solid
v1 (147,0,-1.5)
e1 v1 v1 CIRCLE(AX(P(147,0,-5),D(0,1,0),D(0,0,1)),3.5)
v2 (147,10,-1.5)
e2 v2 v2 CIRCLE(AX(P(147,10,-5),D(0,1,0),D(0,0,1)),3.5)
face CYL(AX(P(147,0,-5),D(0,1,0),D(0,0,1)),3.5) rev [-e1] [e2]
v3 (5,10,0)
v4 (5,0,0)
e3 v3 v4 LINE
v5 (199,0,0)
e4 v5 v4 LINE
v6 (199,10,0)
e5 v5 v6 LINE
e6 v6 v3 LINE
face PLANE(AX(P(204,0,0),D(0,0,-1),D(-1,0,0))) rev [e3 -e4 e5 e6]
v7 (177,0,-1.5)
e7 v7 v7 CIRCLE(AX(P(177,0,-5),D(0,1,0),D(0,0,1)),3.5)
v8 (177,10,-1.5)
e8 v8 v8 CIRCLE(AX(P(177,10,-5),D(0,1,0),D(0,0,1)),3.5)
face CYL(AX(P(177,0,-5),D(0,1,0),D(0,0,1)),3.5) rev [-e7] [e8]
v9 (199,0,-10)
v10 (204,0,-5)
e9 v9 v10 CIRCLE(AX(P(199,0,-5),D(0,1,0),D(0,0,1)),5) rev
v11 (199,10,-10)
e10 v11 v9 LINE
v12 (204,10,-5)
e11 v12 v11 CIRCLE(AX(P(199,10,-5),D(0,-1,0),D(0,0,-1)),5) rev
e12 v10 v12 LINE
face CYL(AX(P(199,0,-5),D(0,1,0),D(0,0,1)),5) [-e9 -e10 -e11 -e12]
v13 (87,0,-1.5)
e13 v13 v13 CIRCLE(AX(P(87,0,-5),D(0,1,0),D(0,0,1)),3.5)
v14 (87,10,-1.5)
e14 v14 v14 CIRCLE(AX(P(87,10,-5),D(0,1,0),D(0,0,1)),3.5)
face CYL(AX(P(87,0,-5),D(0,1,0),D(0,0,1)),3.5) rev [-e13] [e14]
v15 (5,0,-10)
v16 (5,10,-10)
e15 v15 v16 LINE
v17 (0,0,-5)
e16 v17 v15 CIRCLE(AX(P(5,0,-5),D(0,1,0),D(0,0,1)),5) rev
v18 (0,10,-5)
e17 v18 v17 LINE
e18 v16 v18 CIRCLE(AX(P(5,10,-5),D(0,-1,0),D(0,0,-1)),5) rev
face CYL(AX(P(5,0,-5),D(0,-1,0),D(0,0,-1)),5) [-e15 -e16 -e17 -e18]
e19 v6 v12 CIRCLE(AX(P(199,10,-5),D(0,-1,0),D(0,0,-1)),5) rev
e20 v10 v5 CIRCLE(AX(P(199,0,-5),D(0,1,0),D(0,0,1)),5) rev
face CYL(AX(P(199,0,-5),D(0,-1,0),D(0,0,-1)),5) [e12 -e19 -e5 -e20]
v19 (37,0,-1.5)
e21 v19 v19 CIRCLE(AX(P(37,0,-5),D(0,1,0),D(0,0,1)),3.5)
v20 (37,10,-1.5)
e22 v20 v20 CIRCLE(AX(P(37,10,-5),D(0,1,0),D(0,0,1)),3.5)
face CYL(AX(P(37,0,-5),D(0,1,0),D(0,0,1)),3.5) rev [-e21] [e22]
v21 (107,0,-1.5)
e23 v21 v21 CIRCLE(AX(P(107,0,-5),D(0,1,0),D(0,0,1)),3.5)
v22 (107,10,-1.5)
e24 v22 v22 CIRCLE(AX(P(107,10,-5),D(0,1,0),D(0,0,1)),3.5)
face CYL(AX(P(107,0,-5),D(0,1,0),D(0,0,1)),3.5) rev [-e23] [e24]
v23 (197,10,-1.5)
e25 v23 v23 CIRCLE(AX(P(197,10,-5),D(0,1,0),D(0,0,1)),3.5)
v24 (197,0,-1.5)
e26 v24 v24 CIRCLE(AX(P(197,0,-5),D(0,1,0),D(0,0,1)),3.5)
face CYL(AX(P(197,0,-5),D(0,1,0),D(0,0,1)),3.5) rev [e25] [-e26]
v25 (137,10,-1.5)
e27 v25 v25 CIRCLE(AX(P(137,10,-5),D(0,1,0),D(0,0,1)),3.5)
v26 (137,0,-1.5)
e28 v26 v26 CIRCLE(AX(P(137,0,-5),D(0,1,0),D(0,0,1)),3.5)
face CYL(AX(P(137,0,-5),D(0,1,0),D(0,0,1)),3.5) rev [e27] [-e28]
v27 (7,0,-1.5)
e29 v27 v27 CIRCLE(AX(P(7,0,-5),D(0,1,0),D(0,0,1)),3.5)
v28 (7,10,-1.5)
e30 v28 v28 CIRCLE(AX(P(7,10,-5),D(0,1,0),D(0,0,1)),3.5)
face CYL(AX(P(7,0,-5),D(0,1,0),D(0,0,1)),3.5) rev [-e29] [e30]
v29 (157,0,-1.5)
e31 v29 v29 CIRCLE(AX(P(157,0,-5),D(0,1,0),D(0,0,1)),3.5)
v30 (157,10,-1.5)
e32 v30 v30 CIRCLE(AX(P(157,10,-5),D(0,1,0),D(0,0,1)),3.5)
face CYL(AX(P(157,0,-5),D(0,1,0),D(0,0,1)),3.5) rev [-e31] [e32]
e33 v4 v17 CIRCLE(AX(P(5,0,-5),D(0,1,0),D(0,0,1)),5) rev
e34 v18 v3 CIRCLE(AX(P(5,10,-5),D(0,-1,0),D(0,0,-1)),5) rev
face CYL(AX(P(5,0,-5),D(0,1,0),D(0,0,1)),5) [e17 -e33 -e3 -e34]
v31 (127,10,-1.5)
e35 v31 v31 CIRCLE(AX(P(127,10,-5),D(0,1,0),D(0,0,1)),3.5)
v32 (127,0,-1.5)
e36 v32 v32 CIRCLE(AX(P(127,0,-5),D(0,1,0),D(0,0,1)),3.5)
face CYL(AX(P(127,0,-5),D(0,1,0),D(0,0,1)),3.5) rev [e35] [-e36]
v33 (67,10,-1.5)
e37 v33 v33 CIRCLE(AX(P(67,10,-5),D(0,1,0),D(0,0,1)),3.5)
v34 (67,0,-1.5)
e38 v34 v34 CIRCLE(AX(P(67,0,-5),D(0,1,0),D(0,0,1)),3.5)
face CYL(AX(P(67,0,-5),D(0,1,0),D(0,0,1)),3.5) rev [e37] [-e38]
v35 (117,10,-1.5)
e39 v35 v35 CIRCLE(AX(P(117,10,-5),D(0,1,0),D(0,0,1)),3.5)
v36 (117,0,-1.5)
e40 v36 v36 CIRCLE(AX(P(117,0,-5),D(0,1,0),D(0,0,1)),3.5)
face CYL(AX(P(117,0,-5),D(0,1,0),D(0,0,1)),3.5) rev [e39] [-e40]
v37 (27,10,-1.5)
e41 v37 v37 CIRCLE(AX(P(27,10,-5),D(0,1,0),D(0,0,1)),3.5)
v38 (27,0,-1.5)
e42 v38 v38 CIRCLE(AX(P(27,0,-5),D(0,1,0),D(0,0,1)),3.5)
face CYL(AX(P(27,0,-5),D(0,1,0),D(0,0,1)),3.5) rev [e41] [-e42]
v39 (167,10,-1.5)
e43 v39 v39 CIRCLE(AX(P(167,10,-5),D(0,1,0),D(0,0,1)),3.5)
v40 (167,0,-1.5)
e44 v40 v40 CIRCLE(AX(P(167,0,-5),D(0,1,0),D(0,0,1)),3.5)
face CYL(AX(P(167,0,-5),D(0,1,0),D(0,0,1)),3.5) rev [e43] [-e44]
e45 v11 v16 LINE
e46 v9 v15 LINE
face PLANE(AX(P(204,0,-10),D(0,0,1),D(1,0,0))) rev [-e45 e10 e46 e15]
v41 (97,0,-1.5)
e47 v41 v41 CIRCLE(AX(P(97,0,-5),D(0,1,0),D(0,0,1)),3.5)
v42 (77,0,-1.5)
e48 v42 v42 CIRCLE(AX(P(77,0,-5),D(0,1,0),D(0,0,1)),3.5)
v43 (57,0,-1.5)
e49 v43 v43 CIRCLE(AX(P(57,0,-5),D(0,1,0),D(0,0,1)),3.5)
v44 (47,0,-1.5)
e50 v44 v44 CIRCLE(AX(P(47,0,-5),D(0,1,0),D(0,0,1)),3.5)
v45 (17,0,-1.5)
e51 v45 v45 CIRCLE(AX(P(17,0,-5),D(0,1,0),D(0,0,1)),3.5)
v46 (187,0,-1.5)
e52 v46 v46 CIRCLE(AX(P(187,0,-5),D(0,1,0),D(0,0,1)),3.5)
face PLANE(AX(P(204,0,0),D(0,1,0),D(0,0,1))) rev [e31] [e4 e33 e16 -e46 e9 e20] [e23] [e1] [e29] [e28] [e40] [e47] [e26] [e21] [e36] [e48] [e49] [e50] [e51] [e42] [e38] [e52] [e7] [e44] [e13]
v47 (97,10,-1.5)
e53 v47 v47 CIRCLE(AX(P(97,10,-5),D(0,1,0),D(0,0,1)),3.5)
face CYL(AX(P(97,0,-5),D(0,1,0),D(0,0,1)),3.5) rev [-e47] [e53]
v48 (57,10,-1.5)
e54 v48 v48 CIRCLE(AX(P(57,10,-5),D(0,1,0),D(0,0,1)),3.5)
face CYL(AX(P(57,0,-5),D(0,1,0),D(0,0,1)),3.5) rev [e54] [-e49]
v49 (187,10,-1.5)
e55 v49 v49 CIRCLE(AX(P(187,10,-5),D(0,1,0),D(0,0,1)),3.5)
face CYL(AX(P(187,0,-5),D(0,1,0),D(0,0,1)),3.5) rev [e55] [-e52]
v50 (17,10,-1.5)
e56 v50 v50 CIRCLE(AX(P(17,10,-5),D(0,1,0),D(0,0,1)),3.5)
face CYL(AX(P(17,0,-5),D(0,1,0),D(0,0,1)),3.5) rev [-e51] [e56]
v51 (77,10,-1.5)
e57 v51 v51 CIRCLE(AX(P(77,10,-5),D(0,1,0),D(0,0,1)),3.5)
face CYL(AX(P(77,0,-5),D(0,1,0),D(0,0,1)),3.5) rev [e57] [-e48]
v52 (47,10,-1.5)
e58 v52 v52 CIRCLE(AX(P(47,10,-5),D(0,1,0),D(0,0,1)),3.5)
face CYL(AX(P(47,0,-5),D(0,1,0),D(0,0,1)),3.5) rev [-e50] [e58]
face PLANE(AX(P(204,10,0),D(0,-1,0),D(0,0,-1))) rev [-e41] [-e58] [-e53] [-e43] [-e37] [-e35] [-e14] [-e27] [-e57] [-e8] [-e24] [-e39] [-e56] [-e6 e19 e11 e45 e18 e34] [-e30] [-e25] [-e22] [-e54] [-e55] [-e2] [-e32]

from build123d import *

# Parameters (mm, degrees)
SKETCH1_W           = 10
SKETCH1_H           = 10
BOSS_EXTRUDE1_DEPTH = 204
SKETCH2_R           = 3.5
CUT_EXTRUDE1_DEPTH  = 10
LPATTERN1_COUNT     = 20
LPATTERN1_PITCH     = 10
FILLET1_R           = 5


with BuildPart() as part:
    # Sketch1 → Boss-Extrude1 (new body)
    with BuildSketch(Plane(origin=(0, 0, 0), x_dir=(0, 0, -1), z_dir=(1, 0, 0))):
        with Locations((5, 5)):
            Rectangle(SKETCH1_W, SKETCH1_H)
    extrude(amount=BOSS_EXTRUDE1_DEPTH)

    # Sketch2 → Cut-Extrude1 (cut)
    with BuildSketch(Plane(origin=(0, 10, 0), x_dir=(1, 0, 0), z_dir=(0, 1, 0))):
        with Locations(Location((7, 5, 0), (0, 0, 270))):
            Circle(SKETCH2_R)
    cut_extrude1 = extrude(amount=-CUT_EXTRUDE1_DEPTH, mode=Mode.SUBTRACT)

    # LPattern1: Cut-Extrude1 ×20
    with Locations(*[(i * LPATTERN1_PITCH, 0, 0) for i in range(1, LPATTERN1_COUNT)]):
        add(cut_extrude1, mode=Mode.SUBTRACT)

    # Fillet1
    fillet1_edges = [part.edges().sort_by_distance(p)[0] for p in [
        (0, 5, 0),
        (0, 5, -10),
        (204, 5, 0),
        (204, 5, -10),
    ]]
    fillet(fillet1_edges, radius=FILLET1_R - 0.0001)  # a hair under: the kernel refuses the full size


solid = part.part
